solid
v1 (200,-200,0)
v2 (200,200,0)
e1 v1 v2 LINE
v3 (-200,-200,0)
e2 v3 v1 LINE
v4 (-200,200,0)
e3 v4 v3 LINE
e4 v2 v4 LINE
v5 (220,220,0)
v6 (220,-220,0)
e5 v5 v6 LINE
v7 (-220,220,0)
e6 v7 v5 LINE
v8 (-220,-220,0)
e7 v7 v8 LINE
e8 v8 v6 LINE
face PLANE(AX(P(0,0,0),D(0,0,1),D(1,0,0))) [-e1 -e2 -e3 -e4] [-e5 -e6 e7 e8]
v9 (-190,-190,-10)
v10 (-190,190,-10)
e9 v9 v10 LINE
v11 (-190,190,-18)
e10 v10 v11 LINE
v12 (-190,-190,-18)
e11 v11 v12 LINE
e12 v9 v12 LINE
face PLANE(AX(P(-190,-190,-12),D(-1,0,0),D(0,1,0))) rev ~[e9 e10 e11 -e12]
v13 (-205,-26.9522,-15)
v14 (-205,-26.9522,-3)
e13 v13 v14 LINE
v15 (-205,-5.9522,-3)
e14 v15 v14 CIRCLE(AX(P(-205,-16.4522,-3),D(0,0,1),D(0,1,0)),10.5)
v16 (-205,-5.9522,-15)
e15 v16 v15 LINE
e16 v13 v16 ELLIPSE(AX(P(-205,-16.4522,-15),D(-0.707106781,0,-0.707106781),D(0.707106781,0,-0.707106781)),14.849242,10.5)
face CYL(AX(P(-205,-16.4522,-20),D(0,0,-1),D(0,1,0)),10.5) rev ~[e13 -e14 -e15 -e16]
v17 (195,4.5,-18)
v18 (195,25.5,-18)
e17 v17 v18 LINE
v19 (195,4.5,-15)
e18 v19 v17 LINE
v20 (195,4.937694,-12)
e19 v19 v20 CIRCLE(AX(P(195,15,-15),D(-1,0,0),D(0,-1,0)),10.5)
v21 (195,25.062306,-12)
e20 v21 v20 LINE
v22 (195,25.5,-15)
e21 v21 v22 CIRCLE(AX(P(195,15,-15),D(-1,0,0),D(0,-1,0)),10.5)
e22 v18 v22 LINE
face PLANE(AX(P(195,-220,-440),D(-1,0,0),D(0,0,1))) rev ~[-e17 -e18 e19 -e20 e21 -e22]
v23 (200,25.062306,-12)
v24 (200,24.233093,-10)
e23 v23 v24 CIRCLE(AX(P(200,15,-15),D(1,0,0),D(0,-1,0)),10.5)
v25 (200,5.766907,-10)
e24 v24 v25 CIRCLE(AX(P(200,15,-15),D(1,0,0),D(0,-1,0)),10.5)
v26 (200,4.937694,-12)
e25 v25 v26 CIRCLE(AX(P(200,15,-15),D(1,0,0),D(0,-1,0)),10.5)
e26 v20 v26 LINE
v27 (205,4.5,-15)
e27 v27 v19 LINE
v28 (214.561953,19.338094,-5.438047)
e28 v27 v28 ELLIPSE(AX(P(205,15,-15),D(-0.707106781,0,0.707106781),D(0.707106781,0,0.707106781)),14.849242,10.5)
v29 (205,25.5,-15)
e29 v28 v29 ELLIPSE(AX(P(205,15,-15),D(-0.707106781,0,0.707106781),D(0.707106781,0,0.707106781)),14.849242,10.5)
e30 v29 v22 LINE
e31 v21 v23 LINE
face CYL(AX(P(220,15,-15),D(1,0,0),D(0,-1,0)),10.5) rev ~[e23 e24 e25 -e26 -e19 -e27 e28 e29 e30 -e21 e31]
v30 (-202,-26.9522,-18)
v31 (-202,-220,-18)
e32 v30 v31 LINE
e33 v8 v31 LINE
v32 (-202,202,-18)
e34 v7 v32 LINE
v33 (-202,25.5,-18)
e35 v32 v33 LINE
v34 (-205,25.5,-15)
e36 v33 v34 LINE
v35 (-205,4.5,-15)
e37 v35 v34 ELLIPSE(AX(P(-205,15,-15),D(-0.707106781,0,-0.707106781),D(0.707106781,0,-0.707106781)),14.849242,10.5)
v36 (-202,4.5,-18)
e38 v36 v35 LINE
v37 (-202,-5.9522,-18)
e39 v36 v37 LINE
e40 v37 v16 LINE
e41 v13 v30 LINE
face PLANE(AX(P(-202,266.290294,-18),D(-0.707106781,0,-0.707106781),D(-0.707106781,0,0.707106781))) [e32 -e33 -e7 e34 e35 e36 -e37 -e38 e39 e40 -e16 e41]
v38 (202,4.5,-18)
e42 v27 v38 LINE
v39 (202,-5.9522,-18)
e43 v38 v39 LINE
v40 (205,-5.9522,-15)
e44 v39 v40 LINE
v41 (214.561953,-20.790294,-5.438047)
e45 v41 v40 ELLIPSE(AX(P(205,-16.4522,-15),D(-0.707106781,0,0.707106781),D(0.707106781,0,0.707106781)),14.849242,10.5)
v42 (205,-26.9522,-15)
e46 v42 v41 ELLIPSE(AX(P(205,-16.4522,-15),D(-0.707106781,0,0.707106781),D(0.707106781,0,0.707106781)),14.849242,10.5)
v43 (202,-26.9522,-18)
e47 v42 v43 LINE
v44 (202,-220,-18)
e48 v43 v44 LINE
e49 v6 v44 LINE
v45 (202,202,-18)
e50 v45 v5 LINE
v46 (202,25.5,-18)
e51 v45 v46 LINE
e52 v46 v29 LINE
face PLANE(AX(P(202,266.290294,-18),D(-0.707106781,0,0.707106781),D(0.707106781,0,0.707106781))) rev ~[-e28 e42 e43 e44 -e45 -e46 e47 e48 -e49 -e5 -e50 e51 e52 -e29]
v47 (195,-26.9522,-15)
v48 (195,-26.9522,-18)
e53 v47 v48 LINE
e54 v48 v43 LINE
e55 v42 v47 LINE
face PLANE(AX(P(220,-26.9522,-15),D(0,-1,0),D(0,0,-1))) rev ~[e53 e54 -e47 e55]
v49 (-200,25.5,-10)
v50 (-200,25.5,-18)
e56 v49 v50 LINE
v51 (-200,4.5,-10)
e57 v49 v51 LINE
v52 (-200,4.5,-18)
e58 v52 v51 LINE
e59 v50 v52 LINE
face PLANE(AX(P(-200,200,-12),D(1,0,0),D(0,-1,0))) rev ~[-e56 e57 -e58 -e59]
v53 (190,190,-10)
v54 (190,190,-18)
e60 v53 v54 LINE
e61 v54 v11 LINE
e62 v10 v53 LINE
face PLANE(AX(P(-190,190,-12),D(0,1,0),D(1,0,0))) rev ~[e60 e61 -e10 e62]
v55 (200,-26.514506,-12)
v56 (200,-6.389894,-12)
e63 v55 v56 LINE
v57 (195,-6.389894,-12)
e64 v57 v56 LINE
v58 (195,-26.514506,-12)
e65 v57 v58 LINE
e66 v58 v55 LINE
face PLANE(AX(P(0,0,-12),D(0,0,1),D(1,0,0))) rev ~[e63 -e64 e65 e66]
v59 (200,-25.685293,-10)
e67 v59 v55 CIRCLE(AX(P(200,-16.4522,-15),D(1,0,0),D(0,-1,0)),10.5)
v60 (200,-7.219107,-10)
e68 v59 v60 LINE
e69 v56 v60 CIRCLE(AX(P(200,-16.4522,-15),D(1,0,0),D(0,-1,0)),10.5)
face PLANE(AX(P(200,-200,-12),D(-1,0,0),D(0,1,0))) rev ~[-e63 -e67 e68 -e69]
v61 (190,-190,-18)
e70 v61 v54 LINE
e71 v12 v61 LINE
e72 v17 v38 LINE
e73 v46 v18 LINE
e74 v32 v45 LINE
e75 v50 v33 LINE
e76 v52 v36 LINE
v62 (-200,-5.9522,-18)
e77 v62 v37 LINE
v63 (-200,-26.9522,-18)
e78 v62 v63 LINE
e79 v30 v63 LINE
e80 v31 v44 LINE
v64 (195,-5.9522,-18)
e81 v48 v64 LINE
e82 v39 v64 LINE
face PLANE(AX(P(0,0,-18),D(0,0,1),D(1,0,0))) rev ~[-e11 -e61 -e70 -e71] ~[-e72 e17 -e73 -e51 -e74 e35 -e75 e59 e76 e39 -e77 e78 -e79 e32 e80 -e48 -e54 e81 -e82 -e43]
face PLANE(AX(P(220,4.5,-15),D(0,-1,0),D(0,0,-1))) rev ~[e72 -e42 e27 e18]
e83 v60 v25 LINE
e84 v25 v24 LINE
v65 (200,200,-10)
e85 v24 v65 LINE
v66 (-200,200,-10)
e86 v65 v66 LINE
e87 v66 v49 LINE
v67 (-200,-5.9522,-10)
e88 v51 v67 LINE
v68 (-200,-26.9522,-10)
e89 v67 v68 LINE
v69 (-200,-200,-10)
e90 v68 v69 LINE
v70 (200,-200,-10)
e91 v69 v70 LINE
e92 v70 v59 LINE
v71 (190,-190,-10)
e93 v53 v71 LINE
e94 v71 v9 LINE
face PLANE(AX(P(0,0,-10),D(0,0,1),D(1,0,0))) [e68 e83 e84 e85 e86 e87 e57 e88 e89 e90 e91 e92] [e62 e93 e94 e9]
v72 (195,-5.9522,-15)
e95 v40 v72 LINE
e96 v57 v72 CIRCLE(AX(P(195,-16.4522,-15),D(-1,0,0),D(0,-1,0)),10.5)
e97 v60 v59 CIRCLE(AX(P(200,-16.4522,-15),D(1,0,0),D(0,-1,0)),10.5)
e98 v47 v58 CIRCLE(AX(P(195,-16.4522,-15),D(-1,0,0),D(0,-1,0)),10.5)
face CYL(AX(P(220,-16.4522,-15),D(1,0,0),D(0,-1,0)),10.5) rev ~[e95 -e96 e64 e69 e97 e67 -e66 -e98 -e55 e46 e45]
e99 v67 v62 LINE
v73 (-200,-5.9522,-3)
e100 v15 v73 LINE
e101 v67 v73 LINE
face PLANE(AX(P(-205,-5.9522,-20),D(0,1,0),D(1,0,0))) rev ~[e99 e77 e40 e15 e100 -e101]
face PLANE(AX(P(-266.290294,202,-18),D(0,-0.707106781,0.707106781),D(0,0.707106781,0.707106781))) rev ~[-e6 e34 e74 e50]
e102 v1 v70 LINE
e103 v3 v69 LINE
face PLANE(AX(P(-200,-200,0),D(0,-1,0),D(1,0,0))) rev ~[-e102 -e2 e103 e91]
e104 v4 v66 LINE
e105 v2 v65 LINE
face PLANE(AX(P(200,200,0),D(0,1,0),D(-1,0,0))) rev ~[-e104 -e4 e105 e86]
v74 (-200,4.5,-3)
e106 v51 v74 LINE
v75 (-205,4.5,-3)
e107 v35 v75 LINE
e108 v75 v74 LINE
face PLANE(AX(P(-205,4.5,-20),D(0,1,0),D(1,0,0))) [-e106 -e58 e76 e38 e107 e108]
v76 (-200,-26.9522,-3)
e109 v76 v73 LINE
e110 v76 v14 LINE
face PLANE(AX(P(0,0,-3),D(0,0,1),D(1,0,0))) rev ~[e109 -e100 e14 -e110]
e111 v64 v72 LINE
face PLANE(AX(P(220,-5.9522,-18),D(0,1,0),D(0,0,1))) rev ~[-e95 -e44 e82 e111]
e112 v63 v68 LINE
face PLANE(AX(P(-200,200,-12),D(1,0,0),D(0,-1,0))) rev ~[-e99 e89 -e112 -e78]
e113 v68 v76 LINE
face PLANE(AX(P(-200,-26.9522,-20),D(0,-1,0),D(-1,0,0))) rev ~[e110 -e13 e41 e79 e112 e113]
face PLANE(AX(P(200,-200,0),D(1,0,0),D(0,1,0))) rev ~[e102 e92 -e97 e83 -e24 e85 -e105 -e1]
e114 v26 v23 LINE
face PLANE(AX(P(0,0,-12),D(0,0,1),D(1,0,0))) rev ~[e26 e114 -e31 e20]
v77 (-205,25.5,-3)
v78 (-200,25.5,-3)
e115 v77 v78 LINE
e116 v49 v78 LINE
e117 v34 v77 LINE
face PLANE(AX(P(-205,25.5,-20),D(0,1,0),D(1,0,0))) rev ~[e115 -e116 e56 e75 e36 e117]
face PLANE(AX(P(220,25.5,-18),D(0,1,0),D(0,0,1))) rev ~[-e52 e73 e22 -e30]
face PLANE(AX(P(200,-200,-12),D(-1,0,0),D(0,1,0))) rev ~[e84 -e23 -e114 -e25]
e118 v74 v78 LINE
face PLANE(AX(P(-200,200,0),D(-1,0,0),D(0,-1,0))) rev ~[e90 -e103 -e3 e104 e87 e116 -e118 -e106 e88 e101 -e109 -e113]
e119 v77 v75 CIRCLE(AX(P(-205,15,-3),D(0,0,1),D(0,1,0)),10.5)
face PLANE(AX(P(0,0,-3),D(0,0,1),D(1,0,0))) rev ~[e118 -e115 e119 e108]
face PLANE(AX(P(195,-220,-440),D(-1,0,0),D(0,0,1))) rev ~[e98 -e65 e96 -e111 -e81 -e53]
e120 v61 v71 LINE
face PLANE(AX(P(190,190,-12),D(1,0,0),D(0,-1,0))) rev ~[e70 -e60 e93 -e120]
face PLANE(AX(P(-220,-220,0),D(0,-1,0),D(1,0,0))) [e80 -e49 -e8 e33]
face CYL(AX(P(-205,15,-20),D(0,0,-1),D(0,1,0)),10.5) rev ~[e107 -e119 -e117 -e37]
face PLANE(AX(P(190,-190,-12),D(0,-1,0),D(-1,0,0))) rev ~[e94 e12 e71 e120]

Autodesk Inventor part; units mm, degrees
ref_plane "YZ Plane" through (0, 0, 0) normal (1, 0, 0) x (0, 1, 0)
ref_plane "XZ Plane" through (0, 0, 0) normal (0, 1, 0) x (-1, 0, 0)
ref_plane "XY Plane" through (0, 0, 0) normal (0, 0, 1) x (1, 0, 0)
sketch "Skizze1" plane through (0, 0, 0) normal (0, 0, 1) x (1, 0, 0)
  line L0 (-220, -220) -> (220, -220) projected
  line L1 (220, 220) -> (220, -220) projected
  line L2 (-220, 220) -> (-220, -220) projected
  line L3 (-220, 220) -> (220, 220) projected
  line L4 (200, 200) -> (-200, 200) projected
  line L5 (-200, 200) -> (-200, -200) projected
  line L6 (-200, -200) -> (200, -200) projected
  line L7 (200, -200) -> (200, 200) projected
  line L8 (220, -220) -> (-220, -220)
  line L9 (-220, -220) -> (-220, 220)
  line L10 (-220, 220) -> (220, 220)
  line L11 (220, 220) -> (220, -220)
  line L12 (200, -200) -> (-200, -200)
  line L13 (-200, -200) -> (-200, 200)
  line L14 (-200, 200) -> (200, 200)
  line L15 (200, 200) -> (200, -200)
  point P0 (0, 0)
extrude "Extrusion1" add sketch "Skizze1" against normal blind 18
ref_plane "Arbeitsebene1" through (0, 0, -20) normal (0, 0, 1) x (1, 0, 0)
sketch "Skizze3" plane through (0, 0, -20) normal (0, 0, 1) x (1, 0, 0)
  arc A0 (-205, 25.5) -> (-205, 4.5) centre (-205, 15) ccw projected
  arc A1 (-205, 25.5) -> (-205, 4.5) centre (-205, 15) ccw projected
  arc A2 (-205, -5.9522) -> (-205, -26.9522) centre (-205, -16.4522) ccw projected
  arc A3 (-205, -5.9522) -> (-205, -26.9522) centre (-205, -16.4522) ccw projected
  arc A4 (-205, -5.9522) -> (-205, -26.9522) centre (-205, -16.4522) ccw projected
  arc A5 (-205, -5.9522) -> (-205, -26.9522) centre (-205, -16.4522) ccw projected
  line L0 (-200, -26.9522) -> (-205, -26.9522) projected
  line L1 (-205, -5.9522) -> (-200, -5.9522) projected
  line L2 (-205, 4.5) -> (-200, 4.5)
  line L3 (-200, -200) -> (-200, 200) projected
  line L4 (-205, 25.5) -> (-200, 25.5)
  line L5 (-205, -5.9522) -> (-200, -5.9522)
  line L6 (-205, -26.9522) -> (-200, -26.9522)
  arc A6 (-205, 25.5) -> (-205, 4.5) centre (-205, 15) ccw
  arc A7 (-205, -5.9522) -> (-205, -26.9522) centre (-205, -16.4522) ccw
  point P0 (0, 0)
extrude "Extrusion2" cut sketch "Skizze3" along normal blind 17
sketch "Skizze5" plane through (0, 0, -20) normal (0, 0, 1) x (1, 0, 0)
  line L0 (-200, -26.9522) -> (-200, -200) projected
  line L1 (-200, -200) -> (200, -200) projected
  line L2 (200, -200) -> (200, 200) projected
  line L3 (-200, 200) -> (200, 200) projected
  line L4 (-200, -200) -> (200, -200)
  line L5 (200, -200) -> (200, 200)
  line L6 (200, 200) -> (-200, 200)
  line L7 (-200, 200) -> (-200, -200)
  line L8 (-190, -190) -> (190, -190)
  line L9 (190, -190) -> (190, 190)
  line L10 (190, 190) -> (-190, 190)
  line L11 (-190, 190) -> (-190, -190)
  point P0 (0, 0)
  dimension "d8" = 10
  dimension "d9" = 10
  dimension "d10" = 10
  dimension "d11" = 10
extrude "Extrusion3" add sketch "Skizze5" along normal blind 8
ref_plane "Arbeitsebene3" through (220, -220, -440) normal (-1, 0, 0) x (0, 0, 1)
sketch "Skizze6" plane through (220, -220, -440) normal (-1, 0, 0) x (0, 0, 1)
  arc A0 (425, 193.0478) -> (425, 214.0478) centre (425, 203.5478) ccw projected
  arc A1 (425, 224.5) -> (425, 245.5) centre (425, 235) ccw projected
  line L0 (425, 224.5) -> (422, 224.5) projected
  line L1 (422, 214.0478) -> (425, 214.0478) projected
  line L2 (425, 193.0478) -> (422, 193.0478) projected
  line L3 (422, 245.5) -> (425, 245.5) projected
  line L4 (422, 193.0478) -> (428, 193.0478) projected
  line L5 (422, 193.0478) -> (425, 193.0478)
  line L6 (422, 214.0478) -> (425, 214.0478)
  line L7 (428, 214.0478) -> (422, 214.0478) projected
  line L8 (420, 245.5) -> (420, 224.5) projected
  line L9 (422, 224.5) -> (425, 224.5)
  line L10 (422, 245.5) -> (425, 245.5)
  line L11 (420, 193.0478) -> (420, 20) projected
  line L12 (422, 193.0478) -> (422, 214.0478)
  line L13 (422, 224.5) -> (422, 245.5)
  arc A2 (425, 193.0478) -> (425, 214.0478) centre (425, 203.5478) ccw
  arc A3 (425, 224.5) -> (425, 245.5) centre (425, 235) ccw
  point P0 (440, 220)
  point P1 (420, 20)
extrude "Extrusion4" cut sketch "Skizze6" along normal blind 25
sketch "Skizze7" plane through (0, 0, -20) normal (0, 0, -1) x (-1, 0, 0)
  line L0 (190, 190) -> (190, -190) projected
  line L1 (190, -190) -> (-190, -190) projected
  line L2 (-190, -190) -> (-190, 190) projected
  line L3 (-190, 190) -> (190, 190) projected
  line L4 (200, -200) -> (-200, -200) projected
  line L5 (200, 200) -> (200, -200) projected
  line L6 (-200, 200) -> (200, 200) projected
  line L7 (-200, -200) -> (-200, 200) projected
  line L8 (-200, 200) -> (200, 200) projected
  line L9 (-190, -190) -> (-190, 190) projected
  point P0 (0, 0)
extrude "Extrusion5" cut sketch "Skizze7" against normal blind 2
sketch "Skizze8" plane through (0, 0, -12) normal (0, 0, 1) x (1, 0, 0)
  line L0 (-200, -200) -> (200, -200) projected
  line L1 (200, -200) -> (200, 200) projected
  line L2 (200, 200) -> (-200, 200) projected
  line L3 (-200, 200) -> (-200, -200) projected
  line L4 (190, -190) -> (-190, -190) projected
  line L5 (-190, -190) -> (-190, 190) projected
  line L6 (-190, 190) -> (190, 190) projected
  line L7 (190, 190) -> (190, -190) projected
  line L8 (-200, -200) -> (200, -200) projected
  line L9 (200, -200) -> (200, 200) projected
  line L10 (200, 200) -> (-200, 200) projected
  line L11 (-200, 200) -> (-200, -200) projected
  point P0 (0, 0)
extrude "Extrusion6" add sketch "Skizze8" along normal blind 2
chamfer "Fase2" distance 18 angle 45 5 edges at (220, 122.75, -18) (220, -123.4761, -18) (220, -0.7261, -18) (0, 220, -18) (-220, 0, -18)
properties part number "PV_Ramen_CPY_3_CPY1"
